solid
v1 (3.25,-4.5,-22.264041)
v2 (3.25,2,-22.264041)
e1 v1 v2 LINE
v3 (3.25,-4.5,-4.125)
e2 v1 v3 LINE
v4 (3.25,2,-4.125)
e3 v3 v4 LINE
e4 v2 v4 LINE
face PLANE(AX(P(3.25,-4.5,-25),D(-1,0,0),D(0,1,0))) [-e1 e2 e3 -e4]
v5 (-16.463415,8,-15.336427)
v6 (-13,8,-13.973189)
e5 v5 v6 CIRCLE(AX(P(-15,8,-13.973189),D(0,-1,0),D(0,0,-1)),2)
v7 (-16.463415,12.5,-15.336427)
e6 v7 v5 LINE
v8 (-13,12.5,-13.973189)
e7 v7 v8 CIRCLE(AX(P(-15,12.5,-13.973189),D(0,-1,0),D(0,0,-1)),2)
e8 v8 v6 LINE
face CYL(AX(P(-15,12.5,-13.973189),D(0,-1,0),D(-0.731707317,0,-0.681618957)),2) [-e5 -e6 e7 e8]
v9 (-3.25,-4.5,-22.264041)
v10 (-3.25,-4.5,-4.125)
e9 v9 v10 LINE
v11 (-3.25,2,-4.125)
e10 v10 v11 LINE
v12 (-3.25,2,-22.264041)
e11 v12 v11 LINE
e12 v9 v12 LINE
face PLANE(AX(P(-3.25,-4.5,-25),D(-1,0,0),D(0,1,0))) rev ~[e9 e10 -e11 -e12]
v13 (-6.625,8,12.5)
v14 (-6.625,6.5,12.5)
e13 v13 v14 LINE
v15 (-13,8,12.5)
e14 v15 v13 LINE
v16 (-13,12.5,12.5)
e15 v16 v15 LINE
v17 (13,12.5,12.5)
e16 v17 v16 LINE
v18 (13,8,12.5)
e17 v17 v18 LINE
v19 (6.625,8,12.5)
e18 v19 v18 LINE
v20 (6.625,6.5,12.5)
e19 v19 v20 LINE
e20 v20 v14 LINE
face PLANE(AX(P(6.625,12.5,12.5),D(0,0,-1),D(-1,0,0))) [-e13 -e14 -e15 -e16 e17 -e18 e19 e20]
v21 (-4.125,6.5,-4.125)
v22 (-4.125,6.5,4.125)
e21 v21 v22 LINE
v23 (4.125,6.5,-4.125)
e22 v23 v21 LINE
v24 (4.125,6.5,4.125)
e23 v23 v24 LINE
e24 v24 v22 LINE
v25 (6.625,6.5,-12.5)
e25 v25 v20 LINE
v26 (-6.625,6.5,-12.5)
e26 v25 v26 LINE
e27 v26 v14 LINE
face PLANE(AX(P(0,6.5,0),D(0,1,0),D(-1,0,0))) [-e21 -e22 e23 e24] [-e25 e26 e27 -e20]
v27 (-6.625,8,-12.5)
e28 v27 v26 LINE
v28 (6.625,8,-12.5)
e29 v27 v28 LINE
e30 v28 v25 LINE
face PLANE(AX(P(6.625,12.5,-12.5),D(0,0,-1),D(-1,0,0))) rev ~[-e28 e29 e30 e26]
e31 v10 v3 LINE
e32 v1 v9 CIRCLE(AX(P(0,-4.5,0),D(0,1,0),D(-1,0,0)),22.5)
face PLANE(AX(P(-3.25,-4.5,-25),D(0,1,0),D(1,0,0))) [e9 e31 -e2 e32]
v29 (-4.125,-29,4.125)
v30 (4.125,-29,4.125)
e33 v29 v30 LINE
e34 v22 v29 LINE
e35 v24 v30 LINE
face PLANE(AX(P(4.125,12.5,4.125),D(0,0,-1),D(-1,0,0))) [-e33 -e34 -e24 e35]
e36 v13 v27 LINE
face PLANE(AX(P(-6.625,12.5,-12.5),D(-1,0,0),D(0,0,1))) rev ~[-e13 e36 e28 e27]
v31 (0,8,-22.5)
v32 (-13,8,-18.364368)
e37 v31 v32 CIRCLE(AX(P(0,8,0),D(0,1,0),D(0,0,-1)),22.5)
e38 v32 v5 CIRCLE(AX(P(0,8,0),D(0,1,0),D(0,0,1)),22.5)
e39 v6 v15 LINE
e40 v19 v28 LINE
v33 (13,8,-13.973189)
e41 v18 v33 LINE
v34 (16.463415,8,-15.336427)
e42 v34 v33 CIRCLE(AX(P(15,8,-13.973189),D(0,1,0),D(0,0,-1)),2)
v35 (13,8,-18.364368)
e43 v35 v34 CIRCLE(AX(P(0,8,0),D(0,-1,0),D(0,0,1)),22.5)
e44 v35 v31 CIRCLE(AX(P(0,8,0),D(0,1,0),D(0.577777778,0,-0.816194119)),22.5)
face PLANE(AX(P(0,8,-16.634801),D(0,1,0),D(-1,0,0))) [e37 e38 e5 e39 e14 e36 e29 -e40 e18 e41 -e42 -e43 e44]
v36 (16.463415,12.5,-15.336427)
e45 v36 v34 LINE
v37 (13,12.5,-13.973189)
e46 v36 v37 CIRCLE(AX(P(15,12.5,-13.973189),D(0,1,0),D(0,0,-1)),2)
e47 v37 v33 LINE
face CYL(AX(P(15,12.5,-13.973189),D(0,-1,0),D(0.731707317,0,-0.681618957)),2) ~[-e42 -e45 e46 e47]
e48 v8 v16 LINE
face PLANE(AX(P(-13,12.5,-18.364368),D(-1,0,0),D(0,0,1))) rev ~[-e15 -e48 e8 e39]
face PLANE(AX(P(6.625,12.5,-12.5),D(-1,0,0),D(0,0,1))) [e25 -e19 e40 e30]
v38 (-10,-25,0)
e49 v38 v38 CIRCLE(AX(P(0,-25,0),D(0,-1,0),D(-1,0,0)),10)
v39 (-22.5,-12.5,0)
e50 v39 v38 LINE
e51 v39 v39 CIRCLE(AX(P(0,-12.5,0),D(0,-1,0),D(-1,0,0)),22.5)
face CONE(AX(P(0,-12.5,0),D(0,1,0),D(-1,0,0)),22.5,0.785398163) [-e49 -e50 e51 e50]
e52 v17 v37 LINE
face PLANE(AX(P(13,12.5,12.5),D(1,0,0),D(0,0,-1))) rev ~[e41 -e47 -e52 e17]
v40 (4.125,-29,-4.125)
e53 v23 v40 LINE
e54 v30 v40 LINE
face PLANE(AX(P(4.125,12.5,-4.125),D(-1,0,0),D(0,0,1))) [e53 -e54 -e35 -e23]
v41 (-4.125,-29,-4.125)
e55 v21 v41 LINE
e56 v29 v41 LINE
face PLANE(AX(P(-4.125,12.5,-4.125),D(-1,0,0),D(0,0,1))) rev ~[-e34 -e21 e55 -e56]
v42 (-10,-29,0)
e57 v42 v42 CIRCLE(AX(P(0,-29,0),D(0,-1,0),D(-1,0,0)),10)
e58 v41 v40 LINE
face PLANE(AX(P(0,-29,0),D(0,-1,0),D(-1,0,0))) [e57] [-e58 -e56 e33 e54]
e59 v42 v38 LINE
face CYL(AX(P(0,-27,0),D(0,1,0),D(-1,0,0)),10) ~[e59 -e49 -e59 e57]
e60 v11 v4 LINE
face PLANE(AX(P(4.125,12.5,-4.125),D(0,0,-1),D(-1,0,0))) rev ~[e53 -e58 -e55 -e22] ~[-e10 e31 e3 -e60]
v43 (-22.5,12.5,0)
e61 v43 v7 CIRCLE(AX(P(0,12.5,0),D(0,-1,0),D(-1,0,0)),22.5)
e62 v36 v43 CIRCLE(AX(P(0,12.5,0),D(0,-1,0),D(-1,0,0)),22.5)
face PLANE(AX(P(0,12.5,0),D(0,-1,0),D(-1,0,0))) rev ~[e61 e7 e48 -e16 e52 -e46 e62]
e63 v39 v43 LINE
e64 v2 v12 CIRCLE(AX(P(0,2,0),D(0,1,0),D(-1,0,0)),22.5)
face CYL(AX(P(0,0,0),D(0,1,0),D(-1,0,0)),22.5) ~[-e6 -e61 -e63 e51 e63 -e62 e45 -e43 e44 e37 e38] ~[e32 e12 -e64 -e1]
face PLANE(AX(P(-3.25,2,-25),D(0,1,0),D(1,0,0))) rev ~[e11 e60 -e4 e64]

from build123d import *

# Parameters (mm, degrees)
F0_W     = 10
F0_H     = 4
F0_W_2   = 22.5
F0_H_2   = 25
F2_W     = 8.25
F2_H     = 8.25
F3_DEPTH = 41.501
F2_W_2   = 13.25
F2_H_2   = 25
F4_DEPTH = 6
F2_W_3   = 6.375
F5_DEPTH = 4.5
F6_R     = 2
F8_W     = 6.5
F8_H     = 6.5
F9_DEPTH = 25


with BuildPart() as f1:
    # F0 (on Top) → F1 (revolve)
    with BuildSketch(Plane.XY):
        with Locations((-5, -27)):
            Rectangle(F0_W, F0_H)
        Polygon((0, -25), (0, -12.5), (-22.5, -12.5), (-10, -25), align=None)
        with Locations((-11.25, 0)):
            Rectangle(F0_W_2, F0_H_2)
    revolve(axis=Axis((0, -8.25, 0), (0, -1, 0)))

    # F2 (on face) → F3 (cut, through all)
    with BuildSketch(Plane(origin=(0, 12.5, 0), x_dir=(-1, 0, 0), z_dir=(0, 1, 0))):
        Rectangle(F2_W, F2_H)
    extrude(amount=-F3_DEPTH, mode=Mode.SUBTRACT)

    # F2 (on face) → F4 (cut)
    with BuildSketch(Plane(origin=(0, 12.5, 0), x_dir=(-1, 0, 0), z_dir=(0, 1, 0))):
        Rectangle(F2_W_2, F2_H_2)
        Rectangle(F2_W, F2_H, mode=Mode.SUBTRACT)
    extrude(amount=-F4_DEPTH, mode=Mode.SUBTRACT)

    # F2 (on face) → F5 (cut)
    with BuildSketch(Plane(origin=(0, 12.5, 0), x_dir=(-1, 0, 0), z_dir=(0, 1, 0))):
        with BuildLine():
            Line((13, -18.3643676722), (13, -12.5))
            Line((13, -12.5), (6.625, -12.5))
            Line((6.625, -12.5), (-6.625, -12.5))
            Line((-6.625, -12.5), (-13, -12.5))
            Line((-13, -12.5), (-13, -18.3643676722))
            ThreePointArc((-13, -18.3643676722), (-6.8209870025, -21.4411785197), (0, -22.5))
            ThreePointArc((0, -22.5), (6.8209870025, -21.4411785197), (13, -18.3643676722))
        make_face()
        with Locations((9.8125, 0)):
            Rectangle(F2_W_3, F2_H_2)
        Rectangle(F2_W_2, F2_H_2)
        Rectangle(F2_W, F2_H, mode=Mode.SUBTRACT)
        with Locations((-9.8125, 0)):
            Rectangle(F2_W_3, F2_H_2)
    extrude(amount=-F5_DEPTH, mode=Mode.SUBTRACT)

    # F6
    f6_edges = [f1.edges().sort_by_distance(p)[0] for p in [
        (13, 10.25, -18.364368),
        (-13, 10.25, -18.364368),
    ]]
    fillet(f6_edges, radius=F6_R)

    # F8 (on offset) → F9 (cut)
    with BuildSketch(Plane.XY.offset(-25)):
        with Locations((0, -1.25)):
            Rectangle(F8_W, F8_H)
    extrude(amount=F9_DEPTH, mode=Mode.SUBTRACT)


solid = f1.part
